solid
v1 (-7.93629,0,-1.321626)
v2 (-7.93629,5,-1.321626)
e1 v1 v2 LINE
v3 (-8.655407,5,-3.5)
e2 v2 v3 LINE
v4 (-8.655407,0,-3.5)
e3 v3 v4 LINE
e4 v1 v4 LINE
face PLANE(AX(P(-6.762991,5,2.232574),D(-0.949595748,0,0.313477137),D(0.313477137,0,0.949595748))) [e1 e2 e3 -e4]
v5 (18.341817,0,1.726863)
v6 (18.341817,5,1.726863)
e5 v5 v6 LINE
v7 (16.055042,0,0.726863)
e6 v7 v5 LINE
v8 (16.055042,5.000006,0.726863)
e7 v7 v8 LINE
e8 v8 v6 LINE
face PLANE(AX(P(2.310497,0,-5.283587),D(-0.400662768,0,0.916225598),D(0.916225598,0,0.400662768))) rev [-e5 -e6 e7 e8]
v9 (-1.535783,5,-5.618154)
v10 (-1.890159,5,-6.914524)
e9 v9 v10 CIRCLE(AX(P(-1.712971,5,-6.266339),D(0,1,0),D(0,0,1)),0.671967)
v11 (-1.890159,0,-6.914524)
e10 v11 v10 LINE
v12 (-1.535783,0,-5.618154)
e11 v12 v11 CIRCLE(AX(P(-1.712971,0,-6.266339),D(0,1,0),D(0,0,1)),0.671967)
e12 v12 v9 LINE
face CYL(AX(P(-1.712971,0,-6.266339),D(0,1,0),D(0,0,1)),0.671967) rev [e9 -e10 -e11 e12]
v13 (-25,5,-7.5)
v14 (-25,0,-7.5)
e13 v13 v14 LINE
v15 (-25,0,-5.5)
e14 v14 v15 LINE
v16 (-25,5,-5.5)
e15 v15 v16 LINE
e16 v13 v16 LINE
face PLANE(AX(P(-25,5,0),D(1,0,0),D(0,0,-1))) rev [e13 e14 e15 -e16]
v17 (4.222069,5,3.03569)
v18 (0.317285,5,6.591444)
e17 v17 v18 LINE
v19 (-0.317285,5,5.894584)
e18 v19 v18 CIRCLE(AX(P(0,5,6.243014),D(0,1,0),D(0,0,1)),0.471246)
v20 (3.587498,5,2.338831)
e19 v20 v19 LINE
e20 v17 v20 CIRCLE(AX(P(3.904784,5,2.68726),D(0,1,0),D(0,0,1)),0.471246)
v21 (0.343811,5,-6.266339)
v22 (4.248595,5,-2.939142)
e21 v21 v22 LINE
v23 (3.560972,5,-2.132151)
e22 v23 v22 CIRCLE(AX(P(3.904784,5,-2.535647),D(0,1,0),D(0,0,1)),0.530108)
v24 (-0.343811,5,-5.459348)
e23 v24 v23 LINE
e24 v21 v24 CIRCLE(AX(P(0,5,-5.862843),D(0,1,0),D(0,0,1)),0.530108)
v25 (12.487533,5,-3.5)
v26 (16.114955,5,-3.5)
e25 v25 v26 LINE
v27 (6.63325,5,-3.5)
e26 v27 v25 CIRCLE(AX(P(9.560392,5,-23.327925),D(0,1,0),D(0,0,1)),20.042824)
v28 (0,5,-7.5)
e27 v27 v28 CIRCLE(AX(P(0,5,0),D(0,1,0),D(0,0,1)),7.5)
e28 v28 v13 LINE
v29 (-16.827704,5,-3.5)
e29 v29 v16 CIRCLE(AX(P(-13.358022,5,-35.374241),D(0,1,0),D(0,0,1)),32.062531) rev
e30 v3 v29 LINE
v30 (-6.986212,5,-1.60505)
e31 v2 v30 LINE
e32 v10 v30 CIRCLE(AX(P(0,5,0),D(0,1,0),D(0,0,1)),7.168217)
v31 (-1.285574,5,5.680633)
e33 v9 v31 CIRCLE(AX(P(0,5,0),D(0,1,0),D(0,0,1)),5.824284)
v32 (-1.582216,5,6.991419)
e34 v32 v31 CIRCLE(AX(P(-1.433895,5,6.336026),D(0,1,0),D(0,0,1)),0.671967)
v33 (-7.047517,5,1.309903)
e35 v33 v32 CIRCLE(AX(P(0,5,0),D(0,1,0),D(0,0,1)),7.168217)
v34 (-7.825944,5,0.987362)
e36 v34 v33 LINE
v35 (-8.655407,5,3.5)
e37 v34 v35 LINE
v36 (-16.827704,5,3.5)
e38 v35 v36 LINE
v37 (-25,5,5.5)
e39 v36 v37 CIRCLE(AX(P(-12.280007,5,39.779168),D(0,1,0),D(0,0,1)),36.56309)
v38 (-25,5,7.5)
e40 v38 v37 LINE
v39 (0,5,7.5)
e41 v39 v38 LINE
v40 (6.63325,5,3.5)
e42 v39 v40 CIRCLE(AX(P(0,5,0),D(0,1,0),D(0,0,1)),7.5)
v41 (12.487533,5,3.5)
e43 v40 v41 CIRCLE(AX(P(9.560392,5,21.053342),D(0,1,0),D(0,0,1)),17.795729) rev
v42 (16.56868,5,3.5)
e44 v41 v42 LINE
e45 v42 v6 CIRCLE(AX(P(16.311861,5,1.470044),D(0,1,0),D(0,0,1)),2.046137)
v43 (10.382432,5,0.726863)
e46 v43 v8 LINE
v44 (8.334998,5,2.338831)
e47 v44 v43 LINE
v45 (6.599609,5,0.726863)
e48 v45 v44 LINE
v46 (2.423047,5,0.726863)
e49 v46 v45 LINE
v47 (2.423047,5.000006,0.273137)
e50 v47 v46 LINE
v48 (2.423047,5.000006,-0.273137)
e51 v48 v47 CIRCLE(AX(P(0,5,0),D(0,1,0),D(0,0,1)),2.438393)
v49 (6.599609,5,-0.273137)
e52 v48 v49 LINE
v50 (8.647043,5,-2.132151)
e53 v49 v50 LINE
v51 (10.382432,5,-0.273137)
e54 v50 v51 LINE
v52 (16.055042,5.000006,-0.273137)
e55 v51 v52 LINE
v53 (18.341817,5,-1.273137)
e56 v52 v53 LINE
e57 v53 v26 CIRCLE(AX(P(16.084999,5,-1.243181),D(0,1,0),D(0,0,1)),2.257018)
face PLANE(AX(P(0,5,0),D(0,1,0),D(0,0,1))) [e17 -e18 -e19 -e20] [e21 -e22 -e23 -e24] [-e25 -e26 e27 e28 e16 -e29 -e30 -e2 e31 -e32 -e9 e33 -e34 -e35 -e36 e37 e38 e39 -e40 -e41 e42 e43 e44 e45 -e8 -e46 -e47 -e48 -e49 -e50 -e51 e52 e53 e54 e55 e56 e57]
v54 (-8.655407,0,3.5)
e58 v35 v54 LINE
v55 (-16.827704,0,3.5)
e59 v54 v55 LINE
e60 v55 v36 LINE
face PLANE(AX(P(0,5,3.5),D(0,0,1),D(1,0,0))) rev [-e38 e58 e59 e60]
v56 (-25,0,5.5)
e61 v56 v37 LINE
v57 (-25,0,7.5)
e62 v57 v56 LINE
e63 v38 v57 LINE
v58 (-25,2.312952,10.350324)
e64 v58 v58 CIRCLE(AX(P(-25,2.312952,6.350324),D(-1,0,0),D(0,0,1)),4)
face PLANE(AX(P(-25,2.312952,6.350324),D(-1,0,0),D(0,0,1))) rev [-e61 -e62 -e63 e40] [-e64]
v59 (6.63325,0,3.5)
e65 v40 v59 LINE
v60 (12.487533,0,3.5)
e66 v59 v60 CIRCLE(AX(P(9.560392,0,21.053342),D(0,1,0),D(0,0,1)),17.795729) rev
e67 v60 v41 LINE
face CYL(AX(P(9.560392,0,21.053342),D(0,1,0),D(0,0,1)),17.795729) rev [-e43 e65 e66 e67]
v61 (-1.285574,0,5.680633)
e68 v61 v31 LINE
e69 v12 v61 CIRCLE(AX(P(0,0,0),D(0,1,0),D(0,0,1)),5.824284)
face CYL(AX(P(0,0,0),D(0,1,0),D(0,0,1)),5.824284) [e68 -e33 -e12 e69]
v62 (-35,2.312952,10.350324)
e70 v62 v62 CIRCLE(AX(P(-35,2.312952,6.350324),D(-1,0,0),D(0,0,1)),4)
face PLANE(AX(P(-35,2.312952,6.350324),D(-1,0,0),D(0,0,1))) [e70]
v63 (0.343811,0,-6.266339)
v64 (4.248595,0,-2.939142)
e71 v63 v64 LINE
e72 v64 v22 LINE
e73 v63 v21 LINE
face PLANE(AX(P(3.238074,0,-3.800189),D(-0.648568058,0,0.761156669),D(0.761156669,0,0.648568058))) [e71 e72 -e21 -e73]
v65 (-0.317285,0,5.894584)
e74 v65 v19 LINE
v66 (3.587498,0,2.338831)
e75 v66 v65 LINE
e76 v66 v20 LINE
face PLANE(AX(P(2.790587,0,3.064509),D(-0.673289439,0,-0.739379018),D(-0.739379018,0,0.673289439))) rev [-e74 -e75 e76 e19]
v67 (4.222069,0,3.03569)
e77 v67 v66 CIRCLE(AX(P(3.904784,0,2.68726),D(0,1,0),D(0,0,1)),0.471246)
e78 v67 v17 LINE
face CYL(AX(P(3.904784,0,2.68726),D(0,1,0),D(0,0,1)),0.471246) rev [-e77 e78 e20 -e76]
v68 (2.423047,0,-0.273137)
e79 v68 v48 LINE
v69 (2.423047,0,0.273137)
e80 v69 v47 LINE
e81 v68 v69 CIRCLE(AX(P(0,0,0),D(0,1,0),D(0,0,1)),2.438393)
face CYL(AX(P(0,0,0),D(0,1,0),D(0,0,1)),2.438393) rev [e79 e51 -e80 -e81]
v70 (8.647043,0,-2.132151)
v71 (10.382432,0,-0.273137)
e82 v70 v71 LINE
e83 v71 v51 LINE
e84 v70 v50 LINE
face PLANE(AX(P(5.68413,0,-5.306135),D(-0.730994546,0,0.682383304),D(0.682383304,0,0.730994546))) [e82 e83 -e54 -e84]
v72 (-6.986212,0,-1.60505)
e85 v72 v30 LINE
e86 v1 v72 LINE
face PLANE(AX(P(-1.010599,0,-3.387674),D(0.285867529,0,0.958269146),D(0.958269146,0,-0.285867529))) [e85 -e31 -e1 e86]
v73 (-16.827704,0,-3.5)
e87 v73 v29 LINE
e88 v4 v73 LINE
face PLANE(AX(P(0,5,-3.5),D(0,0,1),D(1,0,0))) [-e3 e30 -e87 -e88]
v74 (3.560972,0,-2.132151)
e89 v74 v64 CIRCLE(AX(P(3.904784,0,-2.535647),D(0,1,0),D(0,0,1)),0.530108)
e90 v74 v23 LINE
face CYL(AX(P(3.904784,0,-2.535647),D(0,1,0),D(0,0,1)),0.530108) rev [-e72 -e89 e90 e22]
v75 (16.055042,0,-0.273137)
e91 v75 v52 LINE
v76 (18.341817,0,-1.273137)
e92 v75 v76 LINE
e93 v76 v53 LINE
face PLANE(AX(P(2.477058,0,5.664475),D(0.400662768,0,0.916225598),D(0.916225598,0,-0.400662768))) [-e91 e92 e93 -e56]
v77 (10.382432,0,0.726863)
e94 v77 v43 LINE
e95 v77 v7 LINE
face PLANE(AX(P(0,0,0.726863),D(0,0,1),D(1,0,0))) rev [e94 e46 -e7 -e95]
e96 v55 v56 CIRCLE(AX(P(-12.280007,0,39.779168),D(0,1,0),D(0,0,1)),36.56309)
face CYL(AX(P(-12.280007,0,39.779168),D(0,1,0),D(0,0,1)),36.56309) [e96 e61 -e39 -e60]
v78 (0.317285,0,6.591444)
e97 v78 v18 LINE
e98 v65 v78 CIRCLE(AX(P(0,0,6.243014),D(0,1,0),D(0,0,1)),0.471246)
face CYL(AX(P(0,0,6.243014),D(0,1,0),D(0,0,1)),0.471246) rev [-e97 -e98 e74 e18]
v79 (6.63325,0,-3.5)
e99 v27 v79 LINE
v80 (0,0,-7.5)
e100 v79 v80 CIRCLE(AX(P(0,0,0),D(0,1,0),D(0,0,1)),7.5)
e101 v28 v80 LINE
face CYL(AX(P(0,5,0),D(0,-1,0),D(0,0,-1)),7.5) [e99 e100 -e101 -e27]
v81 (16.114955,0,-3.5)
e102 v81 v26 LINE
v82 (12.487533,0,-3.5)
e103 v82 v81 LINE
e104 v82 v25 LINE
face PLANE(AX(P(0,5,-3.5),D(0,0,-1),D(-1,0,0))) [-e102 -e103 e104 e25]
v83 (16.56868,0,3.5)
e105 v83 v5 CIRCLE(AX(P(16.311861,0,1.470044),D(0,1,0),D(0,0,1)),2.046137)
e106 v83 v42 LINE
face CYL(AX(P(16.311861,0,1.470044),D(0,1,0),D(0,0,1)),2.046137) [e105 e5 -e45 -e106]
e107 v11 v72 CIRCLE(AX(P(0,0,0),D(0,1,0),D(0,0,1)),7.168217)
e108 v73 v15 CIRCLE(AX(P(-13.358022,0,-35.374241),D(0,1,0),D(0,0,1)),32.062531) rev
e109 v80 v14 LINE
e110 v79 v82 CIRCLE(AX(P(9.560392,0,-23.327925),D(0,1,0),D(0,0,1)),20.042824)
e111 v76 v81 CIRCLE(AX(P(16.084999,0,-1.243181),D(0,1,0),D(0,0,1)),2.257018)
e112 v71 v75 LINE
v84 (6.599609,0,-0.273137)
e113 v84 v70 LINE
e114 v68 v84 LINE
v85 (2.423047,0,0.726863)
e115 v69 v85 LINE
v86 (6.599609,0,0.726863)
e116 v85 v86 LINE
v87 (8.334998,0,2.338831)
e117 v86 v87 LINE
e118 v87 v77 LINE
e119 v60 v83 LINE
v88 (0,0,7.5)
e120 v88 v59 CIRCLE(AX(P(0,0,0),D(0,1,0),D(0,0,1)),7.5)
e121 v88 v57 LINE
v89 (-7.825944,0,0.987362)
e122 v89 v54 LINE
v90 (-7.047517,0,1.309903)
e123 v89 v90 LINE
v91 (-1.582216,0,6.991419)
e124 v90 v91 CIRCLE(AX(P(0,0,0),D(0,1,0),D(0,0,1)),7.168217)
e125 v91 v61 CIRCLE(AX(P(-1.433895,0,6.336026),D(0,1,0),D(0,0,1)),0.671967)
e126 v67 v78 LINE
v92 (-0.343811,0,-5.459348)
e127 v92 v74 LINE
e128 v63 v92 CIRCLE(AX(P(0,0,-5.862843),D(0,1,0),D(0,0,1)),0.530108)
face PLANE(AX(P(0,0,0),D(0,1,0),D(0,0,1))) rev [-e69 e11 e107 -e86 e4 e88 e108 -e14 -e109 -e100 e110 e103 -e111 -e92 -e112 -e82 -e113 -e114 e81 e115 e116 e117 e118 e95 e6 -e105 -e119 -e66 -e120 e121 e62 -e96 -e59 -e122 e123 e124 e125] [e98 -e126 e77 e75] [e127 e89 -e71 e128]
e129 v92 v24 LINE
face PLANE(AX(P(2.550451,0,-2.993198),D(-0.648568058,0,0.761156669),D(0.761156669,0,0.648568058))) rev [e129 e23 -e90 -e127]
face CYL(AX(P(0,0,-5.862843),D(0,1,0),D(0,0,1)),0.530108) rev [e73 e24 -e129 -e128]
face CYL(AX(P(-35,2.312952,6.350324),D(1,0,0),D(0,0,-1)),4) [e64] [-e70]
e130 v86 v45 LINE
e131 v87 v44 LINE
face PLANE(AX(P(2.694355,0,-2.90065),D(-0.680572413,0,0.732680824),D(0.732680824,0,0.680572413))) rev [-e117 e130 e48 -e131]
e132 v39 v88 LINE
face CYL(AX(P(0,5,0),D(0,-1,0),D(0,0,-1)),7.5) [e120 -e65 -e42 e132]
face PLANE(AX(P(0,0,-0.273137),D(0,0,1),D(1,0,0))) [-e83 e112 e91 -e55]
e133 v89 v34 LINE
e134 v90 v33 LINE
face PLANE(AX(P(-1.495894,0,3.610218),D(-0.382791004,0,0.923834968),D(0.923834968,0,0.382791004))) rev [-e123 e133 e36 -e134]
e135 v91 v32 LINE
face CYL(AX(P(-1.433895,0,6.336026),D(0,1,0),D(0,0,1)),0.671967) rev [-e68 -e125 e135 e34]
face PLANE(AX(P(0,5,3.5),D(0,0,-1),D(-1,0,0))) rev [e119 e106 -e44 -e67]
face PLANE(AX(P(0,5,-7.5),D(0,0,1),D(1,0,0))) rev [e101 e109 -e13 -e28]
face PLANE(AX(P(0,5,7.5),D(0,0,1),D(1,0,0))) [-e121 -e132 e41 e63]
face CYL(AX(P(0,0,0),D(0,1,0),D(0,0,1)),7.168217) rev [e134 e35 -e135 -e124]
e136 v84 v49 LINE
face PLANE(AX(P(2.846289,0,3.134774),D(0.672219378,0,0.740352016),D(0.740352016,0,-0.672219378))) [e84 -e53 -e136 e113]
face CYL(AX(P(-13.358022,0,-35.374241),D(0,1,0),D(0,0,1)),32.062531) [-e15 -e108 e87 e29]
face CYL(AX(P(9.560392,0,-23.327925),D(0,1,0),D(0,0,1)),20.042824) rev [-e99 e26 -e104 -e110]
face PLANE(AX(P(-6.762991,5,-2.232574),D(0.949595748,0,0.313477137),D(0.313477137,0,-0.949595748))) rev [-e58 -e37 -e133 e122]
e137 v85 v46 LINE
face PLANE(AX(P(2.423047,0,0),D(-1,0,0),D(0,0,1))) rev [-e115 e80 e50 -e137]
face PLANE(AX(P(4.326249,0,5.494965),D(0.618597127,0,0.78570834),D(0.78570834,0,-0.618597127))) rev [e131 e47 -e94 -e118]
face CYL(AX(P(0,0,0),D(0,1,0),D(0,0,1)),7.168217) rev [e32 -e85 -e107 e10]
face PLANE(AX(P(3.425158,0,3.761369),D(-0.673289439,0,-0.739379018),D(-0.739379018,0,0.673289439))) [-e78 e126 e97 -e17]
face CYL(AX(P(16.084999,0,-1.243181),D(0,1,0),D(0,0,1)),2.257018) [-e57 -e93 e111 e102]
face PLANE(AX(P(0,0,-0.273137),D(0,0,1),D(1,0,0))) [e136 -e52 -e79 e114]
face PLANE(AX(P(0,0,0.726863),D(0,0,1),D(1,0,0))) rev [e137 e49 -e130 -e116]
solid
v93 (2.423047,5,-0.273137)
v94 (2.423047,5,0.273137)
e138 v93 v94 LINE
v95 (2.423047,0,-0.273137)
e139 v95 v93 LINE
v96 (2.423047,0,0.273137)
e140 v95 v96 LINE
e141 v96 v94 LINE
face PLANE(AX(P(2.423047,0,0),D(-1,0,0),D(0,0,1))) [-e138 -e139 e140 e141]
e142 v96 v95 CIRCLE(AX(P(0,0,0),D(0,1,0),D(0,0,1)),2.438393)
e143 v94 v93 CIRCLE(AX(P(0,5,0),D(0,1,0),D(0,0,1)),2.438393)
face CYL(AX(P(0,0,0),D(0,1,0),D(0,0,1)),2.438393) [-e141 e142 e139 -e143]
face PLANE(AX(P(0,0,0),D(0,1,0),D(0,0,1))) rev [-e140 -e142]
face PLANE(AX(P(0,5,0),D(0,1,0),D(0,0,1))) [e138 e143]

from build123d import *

# Parameters (mm, degrees)
BOSS_EXTRUDE1_DEPTH = 5
CUT_EXTRUDE1_START  = -5
CUT_EXTRUDE1_DEPTH  = 5
SKETCH3_R           = 4
BOSS_EXTRUDE2_DEPTH = 10


# Read off the part's stored shape, not the designer's step: Cut-Extrude1
with BuildPart() as part:
    # Sketch1 → Boss-Extrude1 (new body)
    with BuildSketch(Plane(origin=(0, 0, 0), x_dir=(1, 0, 0), z_dir=(0, 1, 0))):
        with BuildLine():
            Line((-6.633249581, -3.5), (-8.655407426, -3.5))
            Line((-8.655407426, -3.5), (-25, -3.5))
            Line((-25, -3.5), (-25, -7.5))
            Line((-25, -7.5), (0, -7.5))
            ThreePointArc((0, -7.5), (-3.872983346, -6.422616289), (-6.633249581, -3.5))
        make_face()
        with BuildLine():
            ThreePointArc((-6.633249581, -3.5), (-7.280088319, -1.802862744), (-7.5, 0))
            Line((-7.5, 0), (-8.655407426, -3.5))
            Line((-8.655407426, -3.5), (-6.633249581, -3.5))
        make_face()
        with BuildLine():
            Line((-8.655407426, 3.5), (-7.5, 0))
            ThreePointArc((-7.5, 0), (-7.280088319, 1.802862744), (-6.633249581, 3.5))
            Line((-6.633249581, 3.5), (-8.655407426, 3.5))
        make_face()
        with BuildLine():
            Line((-25, 3.5), (-8.655407426, 3.5))
            Line((-8.655407426, 3.5), (-6.633249581, 3.5))
            ThreePointArc((-6.633249581, 3.5), (-3.872983346, 6.422616289), (0, 7.5))
            Line((0, 7.5), (-25, 7.5))
            Line((-25, 7.5), (-25, 3.5))
        make_face()
        with BuildLine():
            ThreePointArc((0, 7.5), (-3.872983346, 6.422616289), (-6.633249581, 3.5))
            Line((-6.633249581, 3.5), (0, 3.5))
            Line((0, 3.5), (0, 7.5))
        make_face()
        with BuildLine():
            ThreePointArc((-6.633249581, 3.5), (-7.280088319, 1.802862744), (-7.5, 0))
            ThreePointArc((-7.5, 0), (-7.280088319, -1.802862744), (-6.633249581, -3.5))
            Line((-6.633249581, -3.5), (0, -3.5))
            Line((0, -3.5), (0, -7.5))
            ThreePointArc((0, -7.5), (3.872983346, -6.422616289), (6.633249581, -3.5))
            Line((6.633249581, -3.5), (5.841817388, -3.5))
            Line((5.841817388, -3.5), (5.841817388, 3.5))
            Line((5.841817388, 3.5), (6.633249581, 3.5))
            ThreePointArc((6.633249581, 3.5), (3.872983346, 6.422616289), (0, 7.5))
            Line((0, 7.5), (0, 3.5))
            Line((0, 3.5), (-6.633249581, 3.5))
        make_face()
        with BuildLine():
            Line((0, -3.5), (-6.633249581, -3.5))
            ThreePointArc((-6.633249581, -3.5), (-3.872983346, -6.422616289), (0, -7.5))
            Line((0, -7.5), (0, -3.5))
        make_face()
        with BuildLine():
            Line((5.841817388, -3.5), (6.633249581, -3.5))
            ThreePointArc((6.633249581, -3.5), (7.280088319, -1.802862744), (7.5, 0))
            ThreePointArc((7.5, 0), (7.280088319, 1.802862744), (6.633249581, 3.5))
            Line((6.633249581, 3.5), (5.841817388, 3.5))
            Line((5.841817388, 3.5), (5.841817388, -3.5))
        make_face()
        with BuildLine():
            ThreePointArc((7.5, 0), (7.280088319, -1.802862744), (6.633249581, -3.5))
            Line((6.633249581, -3.5), (18.341817388, -3.5))
            Line((18.341817388, -3.5), (18.341817388, 3.5))
            Line((18.341817388, 3.5), (6.633249581, 3.5))
            ThreePointArc((6.633249581, 3.5), (7.280088319, 1.802862744), (7.5, 0))
        make_face()
    extrude(amount=BOSS_EXTRUDE1_DEPTH)

    # Cut-Extrude1 outline → Cut-Extrude1 (cut)
    with BuildSketch(Plane(origin=(0, 5, 0), x_dir=(1, 0, 0), z_dir=(0, 1, 0)).offset(CUT_EXTRUDE1_START)):
        with BuildLine():
            ThreePointArc((-25, -5.5), (-20.971570556, -4.264152844), (-16.827703713, -3.5))
            Line((-16.827703713, -3.5), (-25, -3.5))
            Line((-25, -3.5), (-25, -5.5))
        make_face()
        with BuildLine():
            Line((-6.986211906, 1.605049615), (-7.936290273, 1.321625532))
            Line((-7.936290273, 1.321625532), (-7.5, 0))
            Line((-7.5, 0), (-7.82594424, -0.987361527))
            Line((-7.82594424, -0.987361527), (-7.04751698, -1.309902849))
            ThreePointArc((-7.04751698, -1.309902849), (-5.16604089, -4.969442885), (-1.582216118, -6.991418541))
            ThreePointArc((-1.582216118, -6.991418541), (-0.778502232, -6.484346421), (-1.285574352, -5.680632535))
            ThreePointArc((-1.285574352, -5.680632535), (-5.822856725, -0.128945605), (-1.535782965, 5.618154331))
            ThreePointArc((-1.535782965, 5.618154331), (-1.064786538, 6.443527284), (-1.890159491, 6.914523712))
            ThreePointArc((-1.890159491, 6.914523712), (-5.171568533, 4.963690156), (-6.986211906, 1.605049615))
        make_face()
        with BuildLine():
            ThreePointArc((-16.827703713, 3.5), (-20.979738657, 4.230776773), (-25, 5.5))
            Line((-25, 5.5), (-25, 3.5))
            Line((-25, 3.5), (-16.827703713, 3.5))
        make_face()
        with BuildLine():
            Line((2.423046834, -0.273137336), (2.423046834, 0.273137336))
            ThreePointArc((2.423046834, 0.273137336), (-2.438392906, 0), (2.423046834, -0.273137336))
        make_face()
        with BuildLine():
            ThreePointArc((6.633249581, 3.5), (9.560391533, 3.285101605), (12.487533484, 3.5))
            Line((12.487533484, 3.5), (6.633249581, 3.5))
        make_face()
        with BuildLine():
            ThreePointArc((16.114954724, 3.5), (17.680951034, 2.839133646), (18.341817388, 1.273137336))
            Line((18.341817388, 1.273137336), (18.341817388, 3.5))
            Line((18.341817388, 3.5), (16.114954724, 3.5))
        make_face()
        with BuildLine():
            Line((6.633249581, -3.5), (12.487533484, -3.5))
            ThreePointArc((12.487533484, -3.5), (9.560391532, -3.257612869), (6.633249581, -3.5))
        make_face()
        with BuildLine():
            Line((18.341817388, -3.5), (18.341817388, -1.726862664))
            ThreePointArc((18.341817388, -1.726862664), (17.758698799, -2.916881411), (16.568680051, -3.5))
            Line((16.568680051, -3.5), (18.341817388, -3.5))
        make_face()
        with BuildLine():
            Line((6.599609394, 0.273137336), (2.423046834, 0.273137336))
            ThreePointArc((2.423046834, 0.273137336), (2.438392906, 0), (2.423046834, -0.273137336))
            Line((2.423046834, -0.273137336), (2.423046834, -0.726862664))
            Line((2.423046834, -0.726862664), (6.599609394, -0.726862664))
            Line((6.599609394, -0.726862664), (8.33499846, -2.338830502))
            Line((8.33499846, -2.338830502), (10.382432111, -0.726862664))
            Line((10.382432111, -0.726862664), (16.055042397, -0.726862664))
            Line((16.055042397, -0.726862664), (18.341817388, -1.726862664))
            Line((18.341817388, -1.726862664), (18.341817388, 1.273137336))
            Line((18.341817388, 1.273137336), (16.055042397, 0.273137336))
            Line((16.055042397, 0.273137336), (10.382432111, 0.273137336))
            Line((10.382432111, 0.273137336), (8.647043044, 2.132151084))
            Line((8.647043044, 2.132151084), (6.599609394, 0.273137336))
        make_face()
        with BuildLine():
            ThreePointArc((0.343811413, 6.266339021), (-0.403495587, 6.206654847), (-0.343811413, 5.459347847))
            Line((-0.343811413, 5.459347847), (3.560972322, 2.132151084))
            ThreePointArc((3.560972322, 2.132151084), (4.308279322, 2.191835258), (4.248595147, 2.939142258))
            Line((4.248595147, 2.939142258), (0.343811413, 6.266339021))
        make_face()
        with BuildLine():
            ThreePointArc((4.222069016, -3.035690029), (4.253213498, -2.369974984), (3.587498453, -2.338830502))
            Line((3.587498453, -2.338830502), (-0.317285282, -5.894584161))
            ThreePointArc((-0.317285282, -5.894584161), (-0.348429764, -6.560299207), (0.317285282, -6.591443689))
            Line((0.317285282, -6.591443689), (4.222069016, -3.035690029))
        make_face()
    extrude(amount=CUT_EXTRUDE1_DEPTH, mode=Mode.SUBTRACT)

    # Sketch3 → Boss-Extrude2 (add)
    with BuildSketch(Plane.ZY.offset(25)):
        with Locations((6.35032425, 2.312951567)):
            Circle(SKETCH3_R)
    extrude(amount=BOSS_EXTRUDE2_DEPTH)


solid = part.part
